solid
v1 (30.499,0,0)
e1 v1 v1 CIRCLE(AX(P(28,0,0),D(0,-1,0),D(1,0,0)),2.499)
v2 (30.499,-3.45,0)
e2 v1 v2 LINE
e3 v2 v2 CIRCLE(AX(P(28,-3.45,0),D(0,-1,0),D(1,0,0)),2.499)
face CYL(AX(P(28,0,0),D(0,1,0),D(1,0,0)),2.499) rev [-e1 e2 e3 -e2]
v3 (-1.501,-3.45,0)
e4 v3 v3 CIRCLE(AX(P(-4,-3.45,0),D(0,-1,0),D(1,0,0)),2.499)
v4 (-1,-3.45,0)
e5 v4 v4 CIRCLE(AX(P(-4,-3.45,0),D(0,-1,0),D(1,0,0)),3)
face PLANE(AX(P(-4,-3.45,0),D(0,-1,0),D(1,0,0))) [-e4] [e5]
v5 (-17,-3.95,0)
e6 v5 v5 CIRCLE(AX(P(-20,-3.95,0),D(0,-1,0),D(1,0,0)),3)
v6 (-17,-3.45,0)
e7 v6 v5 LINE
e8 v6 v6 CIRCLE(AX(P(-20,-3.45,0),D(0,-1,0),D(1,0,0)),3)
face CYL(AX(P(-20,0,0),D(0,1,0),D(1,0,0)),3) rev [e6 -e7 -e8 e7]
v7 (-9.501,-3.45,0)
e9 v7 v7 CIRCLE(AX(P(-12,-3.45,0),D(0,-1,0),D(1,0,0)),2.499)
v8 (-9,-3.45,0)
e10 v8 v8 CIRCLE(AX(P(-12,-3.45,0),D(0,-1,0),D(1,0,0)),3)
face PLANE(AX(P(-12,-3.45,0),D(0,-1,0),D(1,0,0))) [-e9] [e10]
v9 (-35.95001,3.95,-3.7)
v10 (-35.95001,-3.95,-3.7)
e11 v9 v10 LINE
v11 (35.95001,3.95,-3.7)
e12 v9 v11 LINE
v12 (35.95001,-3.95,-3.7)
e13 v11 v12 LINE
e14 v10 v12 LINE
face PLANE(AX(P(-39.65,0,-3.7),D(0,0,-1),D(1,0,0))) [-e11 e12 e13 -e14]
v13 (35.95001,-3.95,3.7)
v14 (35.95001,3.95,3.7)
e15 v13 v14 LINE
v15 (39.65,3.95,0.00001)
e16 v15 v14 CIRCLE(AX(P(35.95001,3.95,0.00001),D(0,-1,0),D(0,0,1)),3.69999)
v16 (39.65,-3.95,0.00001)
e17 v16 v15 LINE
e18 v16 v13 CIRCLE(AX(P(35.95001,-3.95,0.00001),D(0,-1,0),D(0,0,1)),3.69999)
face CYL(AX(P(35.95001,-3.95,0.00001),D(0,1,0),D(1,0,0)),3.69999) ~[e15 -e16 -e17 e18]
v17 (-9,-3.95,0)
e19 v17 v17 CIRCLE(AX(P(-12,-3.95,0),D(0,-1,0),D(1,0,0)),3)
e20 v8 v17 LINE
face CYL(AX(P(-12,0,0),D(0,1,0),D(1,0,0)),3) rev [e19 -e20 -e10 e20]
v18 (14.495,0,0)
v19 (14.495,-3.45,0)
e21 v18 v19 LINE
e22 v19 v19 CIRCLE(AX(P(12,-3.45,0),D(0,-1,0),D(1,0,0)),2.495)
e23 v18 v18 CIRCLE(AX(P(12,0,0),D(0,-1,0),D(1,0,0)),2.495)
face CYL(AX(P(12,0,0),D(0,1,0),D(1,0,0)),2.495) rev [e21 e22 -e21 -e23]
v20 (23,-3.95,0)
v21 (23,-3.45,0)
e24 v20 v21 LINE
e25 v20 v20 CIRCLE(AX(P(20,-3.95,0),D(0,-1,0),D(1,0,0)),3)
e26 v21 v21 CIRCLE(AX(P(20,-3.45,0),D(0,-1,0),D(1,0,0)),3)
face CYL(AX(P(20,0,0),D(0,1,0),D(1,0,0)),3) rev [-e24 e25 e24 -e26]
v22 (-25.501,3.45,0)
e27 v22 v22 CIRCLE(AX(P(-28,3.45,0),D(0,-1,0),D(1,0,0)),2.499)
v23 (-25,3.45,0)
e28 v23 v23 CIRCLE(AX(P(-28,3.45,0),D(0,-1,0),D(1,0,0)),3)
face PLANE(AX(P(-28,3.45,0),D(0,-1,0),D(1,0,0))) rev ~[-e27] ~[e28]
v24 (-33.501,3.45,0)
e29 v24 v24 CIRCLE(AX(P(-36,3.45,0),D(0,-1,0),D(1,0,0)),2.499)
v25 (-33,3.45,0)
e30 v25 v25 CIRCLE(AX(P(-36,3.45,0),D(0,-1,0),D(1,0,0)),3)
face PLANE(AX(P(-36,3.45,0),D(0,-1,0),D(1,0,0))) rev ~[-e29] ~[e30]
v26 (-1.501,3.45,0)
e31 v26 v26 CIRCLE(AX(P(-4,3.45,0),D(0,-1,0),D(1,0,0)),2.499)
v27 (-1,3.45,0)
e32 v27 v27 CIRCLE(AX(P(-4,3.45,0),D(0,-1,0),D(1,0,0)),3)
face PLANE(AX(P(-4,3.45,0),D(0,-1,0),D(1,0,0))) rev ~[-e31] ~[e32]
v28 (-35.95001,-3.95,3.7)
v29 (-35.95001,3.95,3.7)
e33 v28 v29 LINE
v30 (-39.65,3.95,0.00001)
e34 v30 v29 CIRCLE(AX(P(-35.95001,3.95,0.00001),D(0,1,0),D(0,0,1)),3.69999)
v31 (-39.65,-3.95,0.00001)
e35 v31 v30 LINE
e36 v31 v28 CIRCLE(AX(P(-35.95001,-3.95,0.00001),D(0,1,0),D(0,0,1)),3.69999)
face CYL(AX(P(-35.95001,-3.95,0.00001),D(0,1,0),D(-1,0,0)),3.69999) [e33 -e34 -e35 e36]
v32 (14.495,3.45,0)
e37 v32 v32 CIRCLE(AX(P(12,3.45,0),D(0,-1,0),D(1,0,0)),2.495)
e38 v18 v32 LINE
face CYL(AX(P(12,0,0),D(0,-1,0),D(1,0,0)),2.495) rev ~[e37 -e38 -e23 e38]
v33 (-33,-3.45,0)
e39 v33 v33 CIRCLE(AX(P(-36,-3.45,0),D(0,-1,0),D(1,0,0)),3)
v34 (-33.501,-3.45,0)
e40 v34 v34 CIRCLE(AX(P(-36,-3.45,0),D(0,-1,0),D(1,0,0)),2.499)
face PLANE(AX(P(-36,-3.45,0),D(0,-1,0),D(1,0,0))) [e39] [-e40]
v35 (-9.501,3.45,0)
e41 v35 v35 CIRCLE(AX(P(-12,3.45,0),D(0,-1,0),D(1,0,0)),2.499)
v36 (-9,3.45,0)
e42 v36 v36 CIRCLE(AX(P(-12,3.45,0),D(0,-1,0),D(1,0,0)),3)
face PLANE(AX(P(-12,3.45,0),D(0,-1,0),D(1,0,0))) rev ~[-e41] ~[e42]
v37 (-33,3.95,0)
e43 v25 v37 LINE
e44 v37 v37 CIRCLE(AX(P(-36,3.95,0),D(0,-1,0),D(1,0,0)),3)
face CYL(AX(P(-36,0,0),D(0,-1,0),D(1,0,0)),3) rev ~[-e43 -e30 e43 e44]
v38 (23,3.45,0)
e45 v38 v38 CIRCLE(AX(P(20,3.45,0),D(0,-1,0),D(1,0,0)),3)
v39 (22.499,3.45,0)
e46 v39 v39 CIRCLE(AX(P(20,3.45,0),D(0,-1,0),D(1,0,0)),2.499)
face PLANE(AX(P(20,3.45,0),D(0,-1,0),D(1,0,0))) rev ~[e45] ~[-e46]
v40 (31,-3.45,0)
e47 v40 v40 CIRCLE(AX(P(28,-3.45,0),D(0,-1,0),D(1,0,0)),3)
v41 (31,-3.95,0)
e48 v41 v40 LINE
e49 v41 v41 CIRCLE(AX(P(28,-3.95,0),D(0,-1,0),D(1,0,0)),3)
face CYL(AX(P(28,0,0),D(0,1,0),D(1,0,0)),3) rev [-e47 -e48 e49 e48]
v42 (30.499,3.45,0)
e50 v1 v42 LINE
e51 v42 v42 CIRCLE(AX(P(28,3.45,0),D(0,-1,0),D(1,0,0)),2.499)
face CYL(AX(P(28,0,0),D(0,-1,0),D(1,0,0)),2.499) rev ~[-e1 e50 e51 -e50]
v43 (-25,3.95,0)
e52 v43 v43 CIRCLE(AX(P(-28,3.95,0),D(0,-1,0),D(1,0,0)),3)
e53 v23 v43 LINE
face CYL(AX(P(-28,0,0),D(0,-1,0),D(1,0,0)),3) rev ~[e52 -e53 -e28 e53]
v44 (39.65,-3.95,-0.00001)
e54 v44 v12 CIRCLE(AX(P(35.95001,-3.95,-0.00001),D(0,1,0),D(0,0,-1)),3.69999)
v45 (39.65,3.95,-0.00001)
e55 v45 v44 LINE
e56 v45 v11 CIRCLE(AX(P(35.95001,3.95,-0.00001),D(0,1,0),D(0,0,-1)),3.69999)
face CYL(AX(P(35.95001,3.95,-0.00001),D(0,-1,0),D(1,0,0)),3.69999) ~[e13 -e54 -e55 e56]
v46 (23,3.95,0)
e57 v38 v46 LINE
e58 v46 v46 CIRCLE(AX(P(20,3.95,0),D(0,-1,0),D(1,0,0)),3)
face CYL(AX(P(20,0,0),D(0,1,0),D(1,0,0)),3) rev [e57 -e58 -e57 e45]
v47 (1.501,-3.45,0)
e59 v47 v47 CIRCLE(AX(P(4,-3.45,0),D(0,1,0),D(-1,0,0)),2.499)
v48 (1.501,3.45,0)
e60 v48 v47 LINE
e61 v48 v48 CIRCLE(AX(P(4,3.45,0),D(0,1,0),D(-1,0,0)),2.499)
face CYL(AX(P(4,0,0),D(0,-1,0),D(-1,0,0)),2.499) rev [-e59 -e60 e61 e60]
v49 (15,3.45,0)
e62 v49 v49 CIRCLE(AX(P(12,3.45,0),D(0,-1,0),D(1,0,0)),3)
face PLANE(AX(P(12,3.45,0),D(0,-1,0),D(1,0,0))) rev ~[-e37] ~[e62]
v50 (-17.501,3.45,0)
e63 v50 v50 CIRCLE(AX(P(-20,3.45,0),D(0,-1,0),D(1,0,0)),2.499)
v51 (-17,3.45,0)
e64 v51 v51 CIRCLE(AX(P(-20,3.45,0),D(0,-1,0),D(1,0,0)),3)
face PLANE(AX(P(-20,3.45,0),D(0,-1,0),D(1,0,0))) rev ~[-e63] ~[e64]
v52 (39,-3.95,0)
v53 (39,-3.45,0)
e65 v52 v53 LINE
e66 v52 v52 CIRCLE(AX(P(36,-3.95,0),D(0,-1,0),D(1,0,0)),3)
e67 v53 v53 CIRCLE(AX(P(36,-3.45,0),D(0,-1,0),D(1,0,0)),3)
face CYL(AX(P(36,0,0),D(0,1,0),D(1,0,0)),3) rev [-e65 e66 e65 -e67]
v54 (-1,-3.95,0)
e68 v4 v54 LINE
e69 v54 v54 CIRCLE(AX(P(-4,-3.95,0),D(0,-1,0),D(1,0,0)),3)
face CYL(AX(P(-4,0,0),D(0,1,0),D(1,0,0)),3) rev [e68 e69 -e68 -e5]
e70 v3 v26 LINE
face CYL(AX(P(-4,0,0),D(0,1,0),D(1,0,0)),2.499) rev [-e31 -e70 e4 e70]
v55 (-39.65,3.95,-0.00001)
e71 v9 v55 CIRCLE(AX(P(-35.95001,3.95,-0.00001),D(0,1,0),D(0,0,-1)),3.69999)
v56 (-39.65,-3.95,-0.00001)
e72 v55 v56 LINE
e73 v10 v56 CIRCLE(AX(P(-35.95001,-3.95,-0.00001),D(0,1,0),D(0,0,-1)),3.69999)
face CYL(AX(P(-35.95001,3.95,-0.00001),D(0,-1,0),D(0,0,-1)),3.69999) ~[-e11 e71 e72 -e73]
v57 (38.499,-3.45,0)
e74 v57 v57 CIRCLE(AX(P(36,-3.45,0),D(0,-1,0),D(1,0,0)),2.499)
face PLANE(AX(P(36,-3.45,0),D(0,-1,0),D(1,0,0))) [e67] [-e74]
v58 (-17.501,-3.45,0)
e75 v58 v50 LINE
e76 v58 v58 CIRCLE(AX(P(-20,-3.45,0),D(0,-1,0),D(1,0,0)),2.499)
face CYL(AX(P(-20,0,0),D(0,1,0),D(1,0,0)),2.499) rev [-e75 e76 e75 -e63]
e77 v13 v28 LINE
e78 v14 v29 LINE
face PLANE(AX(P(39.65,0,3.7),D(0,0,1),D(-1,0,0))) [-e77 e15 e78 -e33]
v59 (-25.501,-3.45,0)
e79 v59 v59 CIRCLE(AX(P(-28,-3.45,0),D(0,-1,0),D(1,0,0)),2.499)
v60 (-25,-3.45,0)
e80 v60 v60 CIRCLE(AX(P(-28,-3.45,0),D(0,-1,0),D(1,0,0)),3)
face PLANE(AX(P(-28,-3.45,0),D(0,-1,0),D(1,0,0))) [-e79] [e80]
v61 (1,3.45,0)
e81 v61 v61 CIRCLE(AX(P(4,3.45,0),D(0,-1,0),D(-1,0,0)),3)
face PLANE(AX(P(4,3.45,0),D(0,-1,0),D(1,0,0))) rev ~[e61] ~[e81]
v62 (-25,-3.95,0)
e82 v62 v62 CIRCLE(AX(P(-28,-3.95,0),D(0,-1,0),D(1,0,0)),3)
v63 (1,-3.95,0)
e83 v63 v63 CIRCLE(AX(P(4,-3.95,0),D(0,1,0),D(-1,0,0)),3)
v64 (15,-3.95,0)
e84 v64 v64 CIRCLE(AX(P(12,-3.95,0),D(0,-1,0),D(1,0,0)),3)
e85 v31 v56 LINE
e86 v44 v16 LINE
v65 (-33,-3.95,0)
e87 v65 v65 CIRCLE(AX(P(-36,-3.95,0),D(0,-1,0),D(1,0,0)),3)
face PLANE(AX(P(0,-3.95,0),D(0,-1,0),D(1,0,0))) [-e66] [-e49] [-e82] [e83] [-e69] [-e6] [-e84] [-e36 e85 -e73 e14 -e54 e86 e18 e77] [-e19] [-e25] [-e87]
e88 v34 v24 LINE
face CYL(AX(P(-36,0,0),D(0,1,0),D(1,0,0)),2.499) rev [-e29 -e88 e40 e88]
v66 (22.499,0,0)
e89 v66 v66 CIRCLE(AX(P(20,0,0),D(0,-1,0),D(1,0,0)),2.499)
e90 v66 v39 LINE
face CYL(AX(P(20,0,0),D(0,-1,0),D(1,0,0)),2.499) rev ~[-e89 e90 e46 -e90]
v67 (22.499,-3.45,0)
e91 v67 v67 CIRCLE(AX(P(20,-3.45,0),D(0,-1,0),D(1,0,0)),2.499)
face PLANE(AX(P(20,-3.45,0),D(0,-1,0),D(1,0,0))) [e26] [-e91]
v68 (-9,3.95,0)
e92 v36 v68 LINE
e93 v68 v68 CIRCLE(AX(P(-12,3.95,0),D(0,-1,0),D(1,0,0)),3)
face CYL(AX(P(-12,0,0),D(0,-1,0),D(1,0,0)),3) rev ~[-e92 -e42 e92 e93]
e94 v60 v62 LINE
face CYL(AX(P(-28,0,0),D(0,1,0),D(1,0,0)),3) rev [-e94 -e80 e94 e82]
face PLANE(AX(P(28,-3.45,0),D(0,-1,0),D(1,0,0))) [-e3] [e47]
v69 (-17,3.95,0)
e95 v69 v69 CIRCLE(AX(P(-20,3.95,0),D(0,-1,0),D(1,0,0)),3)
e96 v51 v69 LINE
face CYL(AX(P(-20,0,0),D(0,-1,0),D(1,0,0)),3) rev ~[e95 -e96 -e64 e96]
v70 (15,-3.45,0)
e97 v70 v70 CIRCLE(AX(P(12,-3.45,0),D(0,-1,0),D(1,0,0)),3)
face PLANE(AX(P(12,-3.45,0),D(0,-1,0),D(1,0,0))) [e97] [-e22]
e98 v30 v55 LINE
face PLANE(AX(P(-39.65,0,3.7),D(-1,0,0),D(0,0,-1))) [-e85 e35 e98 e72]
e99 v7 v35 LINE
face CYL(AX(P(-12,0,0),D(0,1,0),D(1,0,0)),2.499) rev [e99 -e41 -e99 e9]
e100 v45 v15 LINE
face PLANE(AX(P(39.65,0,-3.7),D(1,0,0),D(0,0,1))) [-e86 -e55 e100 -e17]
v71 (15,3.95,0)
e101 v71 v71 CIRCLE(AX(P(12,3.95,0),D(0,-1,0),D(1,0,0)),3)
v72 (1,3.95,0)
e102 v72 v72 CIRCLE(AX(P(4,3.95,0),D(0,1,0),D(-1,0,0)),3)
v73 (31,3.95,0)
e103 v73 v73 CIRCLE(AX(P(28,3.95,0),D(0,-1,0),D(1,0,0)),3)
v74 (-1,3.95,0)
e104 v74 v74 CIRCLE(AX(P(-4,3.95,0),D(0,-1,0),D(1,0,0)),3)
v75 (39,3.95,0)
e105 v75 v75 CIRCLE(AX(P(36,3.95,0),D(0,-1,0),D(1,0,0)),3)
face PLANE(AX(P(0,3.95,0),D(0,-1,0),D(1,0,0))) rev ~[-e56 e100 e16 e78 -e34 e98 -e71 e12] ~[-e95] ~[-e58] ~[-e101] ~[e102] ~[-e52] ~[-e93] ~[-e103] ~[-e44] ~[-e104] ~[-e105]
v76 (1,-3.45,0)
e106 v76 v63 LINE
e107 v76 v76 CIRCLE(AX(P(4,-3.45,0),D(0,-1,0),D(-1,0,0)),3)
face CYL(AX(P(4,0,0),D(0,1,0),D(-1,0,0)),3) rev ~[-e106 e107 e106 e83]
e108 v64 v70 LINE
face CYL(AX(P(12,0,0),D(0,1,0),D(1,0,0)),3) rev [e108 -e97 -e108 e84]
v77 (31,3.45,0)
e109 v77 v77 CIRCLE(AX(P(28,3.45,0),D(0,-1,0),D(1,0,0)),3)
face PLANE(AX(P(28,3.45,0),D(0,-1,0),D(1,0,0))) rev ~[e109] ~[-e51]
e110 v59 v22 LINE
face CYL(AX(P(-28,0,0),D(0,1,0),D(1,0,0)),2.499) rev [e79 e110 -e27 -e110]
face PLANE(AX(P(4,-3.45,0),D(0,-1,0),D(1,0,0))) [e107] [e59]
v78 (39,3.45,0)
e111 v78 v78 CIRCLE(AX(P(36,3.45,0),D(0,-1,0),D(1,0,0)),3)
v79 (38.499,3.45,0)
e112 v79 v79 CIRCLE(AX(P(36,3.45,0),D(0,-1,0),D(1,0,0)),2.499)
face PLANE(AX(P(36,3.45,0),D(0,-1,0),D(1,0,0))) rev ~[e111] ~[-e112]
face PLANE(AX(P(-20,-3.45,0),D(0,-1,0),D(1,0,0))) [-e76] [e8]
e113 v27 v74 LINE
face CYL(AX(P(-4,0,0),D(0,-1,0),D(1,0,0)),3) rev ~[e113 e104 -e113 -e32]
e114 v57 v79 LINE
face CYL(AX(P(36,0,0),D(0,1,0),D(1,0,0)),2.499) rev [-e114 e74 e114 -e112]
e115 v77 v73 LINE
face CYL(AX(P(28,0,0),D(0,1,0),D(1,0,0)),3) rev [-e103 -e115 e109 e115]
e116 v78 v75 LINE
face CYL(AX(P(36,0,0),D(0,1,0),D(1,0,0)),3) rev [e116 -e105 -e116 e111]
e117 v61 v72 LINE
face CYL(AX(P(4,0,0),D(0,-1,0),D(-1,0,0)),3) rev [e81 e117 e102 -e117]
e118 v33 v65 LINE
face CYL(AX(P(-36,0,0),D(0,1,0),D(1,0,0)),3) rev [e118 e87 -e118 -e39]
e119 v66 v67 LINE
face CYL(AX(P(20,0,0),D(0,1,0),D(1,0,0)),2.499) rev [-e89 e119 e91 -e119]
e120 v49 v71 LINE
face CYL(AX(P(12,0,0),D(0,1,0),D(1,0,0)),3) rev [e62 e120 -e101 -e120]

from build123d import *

# Parameters (mm, degrees)
F0_R     = 3
F1_DEPTH = 3.95
F0_R_2   = 2.499
F0_R_3   = 2.495
F2_DEPTH = 3.45
F3_R     = 3.69999
F4_R     = 3.69999


# Not quite as in the source:
# - a fillet or chamfer is up to 0.001 mm smaller than in the source, because OpenCascade refuses the exact size


with BuildPart() as f1:
    # F0 (on Front) → F1 (new body, symmetric)
    with BuildSketch(Plane.XZ):
        Polygon((-39.65, 3.7), (-39.65, -3.7), (39.65, -3.7), (39.65, 3.7), (0, 3.7), align=None)
        with Locations((-36, 0)):
            Circle(F0_R, mode=Mode.SUBTRACT)
        with Locations((-28, 0)):
            Circle(F0_R, mode=Mode.SUBTRACT)
        with Locations((-20, 0)):
            Circle(F0_R, mode=Mode.SUBTRACT)
        with Locations((-12, 0)):
            Circle(F0_R, mode=Mode.SUBTRACT)
        with Locations((-4, 0)):
            Circle(F0_R, mode=Mode.SUBTRACT)
        with BuildLine():
            ThreePointArc((7, 0), (4, -3), (1, 0))
            ThreePointArc((1, 0), (4, 3), (7, 0))
        make_face(mode=Mode.SUBTRACT)
        with Locations((12, 0)):
            Circle(F0_R, mode=Mode.SUBTRACT)
        with Locations((20, 0)):
            Circle(F0_R, mode=Mode.SUBTRACT)
        with Locations((28, 0)):
            Circle(F0_R, mode=Mode.SUBTRACT)
        with Locations((36, 0)):
            Circle(F0_R, mode=Mode.SUBTRACT)
    extrude(amount=F1_DEPTH, both=True)

    # F0 (on Front) → F2 (join, symmetric)
    with BuildSketch(Plane.XZ):
        with Locations((-36, 0)):
            Circle(F0_R)
        with Locations((-36, 0)):
            Circle(F0_R_2, mode=Mode.SUBTRACT)
        with Locations((-28, 0)):
            Circle(F0_R)
        with Locations((-28, 0)):
            Circle(F0_R_2, mode=Mode.SUBTRACT)
        with Locations((-20, 0)):
            Circle(F0_R)
        with Locations((-20, 0)):
            Circle(F0_R_2, mode=Mode.SUBTRACT)
        with Locations((-12, 0)):
            Circle(F0_R)
        with Locations((-12, 0)):
            Circle(F0_R_2, mode=Mode.SUBTRACT)
        with Locations((-4, 0)):
            Circle(F0_R)
        with Locations((-4, 0)):
            Circle(F0_R_2, mode=Mode.SUBTRACT)
        with BuildLine():
            ThreePointArc((7, 0), (4, 3), (1, 0))
            ThreePointArc((1, 0), (4, -3), (7, 0))
        make_face()
        with BuildLine():
            ThreePointArc((6.499, 0), (4, -2.499), (1.501, 0))
            ThreePointArc((1.501, 0), (4, 2.499), (6.499, 0))
        make_face(mode=Mode.SUBTRACT)
        with Locations((12, 0)):
            Circle(F0_R)
        with Locations((12, 0)):
            Circle(F0_R_3, mode=Mode.SUBTRACT)
        with Locations((20, 0)):
            Circle(F0_R)
        with Locations((20, 0)):
            Circle(F0_R_2, mode=Mode.SUBTRACT)
        with Locations((28, 0)):
            Circle(F0_R)
        with Locations((28, 0)):
            Circle(F0_R_2, mode=Mode.SUBTRACT)
        with Locations((36, 0)):
            Circle(F0_R)
        with Locations((36, 0)):
            Circle(F0_R_2, mode=Mode.SUBTRACT)
    extrude(amount=F2_DEPTH, both=True)

    # F3 (radius 3.7 in the source; OpenCascade refuses exactly that, so slightly less here)
    f3_edges = [f1.edges().sort_by_distance(p)[0] for p in [
        (39.65, 0, 3.7),
        (39.65, 0, -3.7),
    ]]
    fillet(f3_edges, radius=F3_R)

    # F4 (radius 3.7 in the source; OpenCascade refuses exactly that, so slightly less here)
    f4_edges = [f1.edges().sort_by_distance(p)[0] for p in [
        (-39.65, 0, 3.7),
        (-39.65, 0, -3.7),
    ]]
    fillet(f4_edges, radius=F4_R)


solid = f1.part
